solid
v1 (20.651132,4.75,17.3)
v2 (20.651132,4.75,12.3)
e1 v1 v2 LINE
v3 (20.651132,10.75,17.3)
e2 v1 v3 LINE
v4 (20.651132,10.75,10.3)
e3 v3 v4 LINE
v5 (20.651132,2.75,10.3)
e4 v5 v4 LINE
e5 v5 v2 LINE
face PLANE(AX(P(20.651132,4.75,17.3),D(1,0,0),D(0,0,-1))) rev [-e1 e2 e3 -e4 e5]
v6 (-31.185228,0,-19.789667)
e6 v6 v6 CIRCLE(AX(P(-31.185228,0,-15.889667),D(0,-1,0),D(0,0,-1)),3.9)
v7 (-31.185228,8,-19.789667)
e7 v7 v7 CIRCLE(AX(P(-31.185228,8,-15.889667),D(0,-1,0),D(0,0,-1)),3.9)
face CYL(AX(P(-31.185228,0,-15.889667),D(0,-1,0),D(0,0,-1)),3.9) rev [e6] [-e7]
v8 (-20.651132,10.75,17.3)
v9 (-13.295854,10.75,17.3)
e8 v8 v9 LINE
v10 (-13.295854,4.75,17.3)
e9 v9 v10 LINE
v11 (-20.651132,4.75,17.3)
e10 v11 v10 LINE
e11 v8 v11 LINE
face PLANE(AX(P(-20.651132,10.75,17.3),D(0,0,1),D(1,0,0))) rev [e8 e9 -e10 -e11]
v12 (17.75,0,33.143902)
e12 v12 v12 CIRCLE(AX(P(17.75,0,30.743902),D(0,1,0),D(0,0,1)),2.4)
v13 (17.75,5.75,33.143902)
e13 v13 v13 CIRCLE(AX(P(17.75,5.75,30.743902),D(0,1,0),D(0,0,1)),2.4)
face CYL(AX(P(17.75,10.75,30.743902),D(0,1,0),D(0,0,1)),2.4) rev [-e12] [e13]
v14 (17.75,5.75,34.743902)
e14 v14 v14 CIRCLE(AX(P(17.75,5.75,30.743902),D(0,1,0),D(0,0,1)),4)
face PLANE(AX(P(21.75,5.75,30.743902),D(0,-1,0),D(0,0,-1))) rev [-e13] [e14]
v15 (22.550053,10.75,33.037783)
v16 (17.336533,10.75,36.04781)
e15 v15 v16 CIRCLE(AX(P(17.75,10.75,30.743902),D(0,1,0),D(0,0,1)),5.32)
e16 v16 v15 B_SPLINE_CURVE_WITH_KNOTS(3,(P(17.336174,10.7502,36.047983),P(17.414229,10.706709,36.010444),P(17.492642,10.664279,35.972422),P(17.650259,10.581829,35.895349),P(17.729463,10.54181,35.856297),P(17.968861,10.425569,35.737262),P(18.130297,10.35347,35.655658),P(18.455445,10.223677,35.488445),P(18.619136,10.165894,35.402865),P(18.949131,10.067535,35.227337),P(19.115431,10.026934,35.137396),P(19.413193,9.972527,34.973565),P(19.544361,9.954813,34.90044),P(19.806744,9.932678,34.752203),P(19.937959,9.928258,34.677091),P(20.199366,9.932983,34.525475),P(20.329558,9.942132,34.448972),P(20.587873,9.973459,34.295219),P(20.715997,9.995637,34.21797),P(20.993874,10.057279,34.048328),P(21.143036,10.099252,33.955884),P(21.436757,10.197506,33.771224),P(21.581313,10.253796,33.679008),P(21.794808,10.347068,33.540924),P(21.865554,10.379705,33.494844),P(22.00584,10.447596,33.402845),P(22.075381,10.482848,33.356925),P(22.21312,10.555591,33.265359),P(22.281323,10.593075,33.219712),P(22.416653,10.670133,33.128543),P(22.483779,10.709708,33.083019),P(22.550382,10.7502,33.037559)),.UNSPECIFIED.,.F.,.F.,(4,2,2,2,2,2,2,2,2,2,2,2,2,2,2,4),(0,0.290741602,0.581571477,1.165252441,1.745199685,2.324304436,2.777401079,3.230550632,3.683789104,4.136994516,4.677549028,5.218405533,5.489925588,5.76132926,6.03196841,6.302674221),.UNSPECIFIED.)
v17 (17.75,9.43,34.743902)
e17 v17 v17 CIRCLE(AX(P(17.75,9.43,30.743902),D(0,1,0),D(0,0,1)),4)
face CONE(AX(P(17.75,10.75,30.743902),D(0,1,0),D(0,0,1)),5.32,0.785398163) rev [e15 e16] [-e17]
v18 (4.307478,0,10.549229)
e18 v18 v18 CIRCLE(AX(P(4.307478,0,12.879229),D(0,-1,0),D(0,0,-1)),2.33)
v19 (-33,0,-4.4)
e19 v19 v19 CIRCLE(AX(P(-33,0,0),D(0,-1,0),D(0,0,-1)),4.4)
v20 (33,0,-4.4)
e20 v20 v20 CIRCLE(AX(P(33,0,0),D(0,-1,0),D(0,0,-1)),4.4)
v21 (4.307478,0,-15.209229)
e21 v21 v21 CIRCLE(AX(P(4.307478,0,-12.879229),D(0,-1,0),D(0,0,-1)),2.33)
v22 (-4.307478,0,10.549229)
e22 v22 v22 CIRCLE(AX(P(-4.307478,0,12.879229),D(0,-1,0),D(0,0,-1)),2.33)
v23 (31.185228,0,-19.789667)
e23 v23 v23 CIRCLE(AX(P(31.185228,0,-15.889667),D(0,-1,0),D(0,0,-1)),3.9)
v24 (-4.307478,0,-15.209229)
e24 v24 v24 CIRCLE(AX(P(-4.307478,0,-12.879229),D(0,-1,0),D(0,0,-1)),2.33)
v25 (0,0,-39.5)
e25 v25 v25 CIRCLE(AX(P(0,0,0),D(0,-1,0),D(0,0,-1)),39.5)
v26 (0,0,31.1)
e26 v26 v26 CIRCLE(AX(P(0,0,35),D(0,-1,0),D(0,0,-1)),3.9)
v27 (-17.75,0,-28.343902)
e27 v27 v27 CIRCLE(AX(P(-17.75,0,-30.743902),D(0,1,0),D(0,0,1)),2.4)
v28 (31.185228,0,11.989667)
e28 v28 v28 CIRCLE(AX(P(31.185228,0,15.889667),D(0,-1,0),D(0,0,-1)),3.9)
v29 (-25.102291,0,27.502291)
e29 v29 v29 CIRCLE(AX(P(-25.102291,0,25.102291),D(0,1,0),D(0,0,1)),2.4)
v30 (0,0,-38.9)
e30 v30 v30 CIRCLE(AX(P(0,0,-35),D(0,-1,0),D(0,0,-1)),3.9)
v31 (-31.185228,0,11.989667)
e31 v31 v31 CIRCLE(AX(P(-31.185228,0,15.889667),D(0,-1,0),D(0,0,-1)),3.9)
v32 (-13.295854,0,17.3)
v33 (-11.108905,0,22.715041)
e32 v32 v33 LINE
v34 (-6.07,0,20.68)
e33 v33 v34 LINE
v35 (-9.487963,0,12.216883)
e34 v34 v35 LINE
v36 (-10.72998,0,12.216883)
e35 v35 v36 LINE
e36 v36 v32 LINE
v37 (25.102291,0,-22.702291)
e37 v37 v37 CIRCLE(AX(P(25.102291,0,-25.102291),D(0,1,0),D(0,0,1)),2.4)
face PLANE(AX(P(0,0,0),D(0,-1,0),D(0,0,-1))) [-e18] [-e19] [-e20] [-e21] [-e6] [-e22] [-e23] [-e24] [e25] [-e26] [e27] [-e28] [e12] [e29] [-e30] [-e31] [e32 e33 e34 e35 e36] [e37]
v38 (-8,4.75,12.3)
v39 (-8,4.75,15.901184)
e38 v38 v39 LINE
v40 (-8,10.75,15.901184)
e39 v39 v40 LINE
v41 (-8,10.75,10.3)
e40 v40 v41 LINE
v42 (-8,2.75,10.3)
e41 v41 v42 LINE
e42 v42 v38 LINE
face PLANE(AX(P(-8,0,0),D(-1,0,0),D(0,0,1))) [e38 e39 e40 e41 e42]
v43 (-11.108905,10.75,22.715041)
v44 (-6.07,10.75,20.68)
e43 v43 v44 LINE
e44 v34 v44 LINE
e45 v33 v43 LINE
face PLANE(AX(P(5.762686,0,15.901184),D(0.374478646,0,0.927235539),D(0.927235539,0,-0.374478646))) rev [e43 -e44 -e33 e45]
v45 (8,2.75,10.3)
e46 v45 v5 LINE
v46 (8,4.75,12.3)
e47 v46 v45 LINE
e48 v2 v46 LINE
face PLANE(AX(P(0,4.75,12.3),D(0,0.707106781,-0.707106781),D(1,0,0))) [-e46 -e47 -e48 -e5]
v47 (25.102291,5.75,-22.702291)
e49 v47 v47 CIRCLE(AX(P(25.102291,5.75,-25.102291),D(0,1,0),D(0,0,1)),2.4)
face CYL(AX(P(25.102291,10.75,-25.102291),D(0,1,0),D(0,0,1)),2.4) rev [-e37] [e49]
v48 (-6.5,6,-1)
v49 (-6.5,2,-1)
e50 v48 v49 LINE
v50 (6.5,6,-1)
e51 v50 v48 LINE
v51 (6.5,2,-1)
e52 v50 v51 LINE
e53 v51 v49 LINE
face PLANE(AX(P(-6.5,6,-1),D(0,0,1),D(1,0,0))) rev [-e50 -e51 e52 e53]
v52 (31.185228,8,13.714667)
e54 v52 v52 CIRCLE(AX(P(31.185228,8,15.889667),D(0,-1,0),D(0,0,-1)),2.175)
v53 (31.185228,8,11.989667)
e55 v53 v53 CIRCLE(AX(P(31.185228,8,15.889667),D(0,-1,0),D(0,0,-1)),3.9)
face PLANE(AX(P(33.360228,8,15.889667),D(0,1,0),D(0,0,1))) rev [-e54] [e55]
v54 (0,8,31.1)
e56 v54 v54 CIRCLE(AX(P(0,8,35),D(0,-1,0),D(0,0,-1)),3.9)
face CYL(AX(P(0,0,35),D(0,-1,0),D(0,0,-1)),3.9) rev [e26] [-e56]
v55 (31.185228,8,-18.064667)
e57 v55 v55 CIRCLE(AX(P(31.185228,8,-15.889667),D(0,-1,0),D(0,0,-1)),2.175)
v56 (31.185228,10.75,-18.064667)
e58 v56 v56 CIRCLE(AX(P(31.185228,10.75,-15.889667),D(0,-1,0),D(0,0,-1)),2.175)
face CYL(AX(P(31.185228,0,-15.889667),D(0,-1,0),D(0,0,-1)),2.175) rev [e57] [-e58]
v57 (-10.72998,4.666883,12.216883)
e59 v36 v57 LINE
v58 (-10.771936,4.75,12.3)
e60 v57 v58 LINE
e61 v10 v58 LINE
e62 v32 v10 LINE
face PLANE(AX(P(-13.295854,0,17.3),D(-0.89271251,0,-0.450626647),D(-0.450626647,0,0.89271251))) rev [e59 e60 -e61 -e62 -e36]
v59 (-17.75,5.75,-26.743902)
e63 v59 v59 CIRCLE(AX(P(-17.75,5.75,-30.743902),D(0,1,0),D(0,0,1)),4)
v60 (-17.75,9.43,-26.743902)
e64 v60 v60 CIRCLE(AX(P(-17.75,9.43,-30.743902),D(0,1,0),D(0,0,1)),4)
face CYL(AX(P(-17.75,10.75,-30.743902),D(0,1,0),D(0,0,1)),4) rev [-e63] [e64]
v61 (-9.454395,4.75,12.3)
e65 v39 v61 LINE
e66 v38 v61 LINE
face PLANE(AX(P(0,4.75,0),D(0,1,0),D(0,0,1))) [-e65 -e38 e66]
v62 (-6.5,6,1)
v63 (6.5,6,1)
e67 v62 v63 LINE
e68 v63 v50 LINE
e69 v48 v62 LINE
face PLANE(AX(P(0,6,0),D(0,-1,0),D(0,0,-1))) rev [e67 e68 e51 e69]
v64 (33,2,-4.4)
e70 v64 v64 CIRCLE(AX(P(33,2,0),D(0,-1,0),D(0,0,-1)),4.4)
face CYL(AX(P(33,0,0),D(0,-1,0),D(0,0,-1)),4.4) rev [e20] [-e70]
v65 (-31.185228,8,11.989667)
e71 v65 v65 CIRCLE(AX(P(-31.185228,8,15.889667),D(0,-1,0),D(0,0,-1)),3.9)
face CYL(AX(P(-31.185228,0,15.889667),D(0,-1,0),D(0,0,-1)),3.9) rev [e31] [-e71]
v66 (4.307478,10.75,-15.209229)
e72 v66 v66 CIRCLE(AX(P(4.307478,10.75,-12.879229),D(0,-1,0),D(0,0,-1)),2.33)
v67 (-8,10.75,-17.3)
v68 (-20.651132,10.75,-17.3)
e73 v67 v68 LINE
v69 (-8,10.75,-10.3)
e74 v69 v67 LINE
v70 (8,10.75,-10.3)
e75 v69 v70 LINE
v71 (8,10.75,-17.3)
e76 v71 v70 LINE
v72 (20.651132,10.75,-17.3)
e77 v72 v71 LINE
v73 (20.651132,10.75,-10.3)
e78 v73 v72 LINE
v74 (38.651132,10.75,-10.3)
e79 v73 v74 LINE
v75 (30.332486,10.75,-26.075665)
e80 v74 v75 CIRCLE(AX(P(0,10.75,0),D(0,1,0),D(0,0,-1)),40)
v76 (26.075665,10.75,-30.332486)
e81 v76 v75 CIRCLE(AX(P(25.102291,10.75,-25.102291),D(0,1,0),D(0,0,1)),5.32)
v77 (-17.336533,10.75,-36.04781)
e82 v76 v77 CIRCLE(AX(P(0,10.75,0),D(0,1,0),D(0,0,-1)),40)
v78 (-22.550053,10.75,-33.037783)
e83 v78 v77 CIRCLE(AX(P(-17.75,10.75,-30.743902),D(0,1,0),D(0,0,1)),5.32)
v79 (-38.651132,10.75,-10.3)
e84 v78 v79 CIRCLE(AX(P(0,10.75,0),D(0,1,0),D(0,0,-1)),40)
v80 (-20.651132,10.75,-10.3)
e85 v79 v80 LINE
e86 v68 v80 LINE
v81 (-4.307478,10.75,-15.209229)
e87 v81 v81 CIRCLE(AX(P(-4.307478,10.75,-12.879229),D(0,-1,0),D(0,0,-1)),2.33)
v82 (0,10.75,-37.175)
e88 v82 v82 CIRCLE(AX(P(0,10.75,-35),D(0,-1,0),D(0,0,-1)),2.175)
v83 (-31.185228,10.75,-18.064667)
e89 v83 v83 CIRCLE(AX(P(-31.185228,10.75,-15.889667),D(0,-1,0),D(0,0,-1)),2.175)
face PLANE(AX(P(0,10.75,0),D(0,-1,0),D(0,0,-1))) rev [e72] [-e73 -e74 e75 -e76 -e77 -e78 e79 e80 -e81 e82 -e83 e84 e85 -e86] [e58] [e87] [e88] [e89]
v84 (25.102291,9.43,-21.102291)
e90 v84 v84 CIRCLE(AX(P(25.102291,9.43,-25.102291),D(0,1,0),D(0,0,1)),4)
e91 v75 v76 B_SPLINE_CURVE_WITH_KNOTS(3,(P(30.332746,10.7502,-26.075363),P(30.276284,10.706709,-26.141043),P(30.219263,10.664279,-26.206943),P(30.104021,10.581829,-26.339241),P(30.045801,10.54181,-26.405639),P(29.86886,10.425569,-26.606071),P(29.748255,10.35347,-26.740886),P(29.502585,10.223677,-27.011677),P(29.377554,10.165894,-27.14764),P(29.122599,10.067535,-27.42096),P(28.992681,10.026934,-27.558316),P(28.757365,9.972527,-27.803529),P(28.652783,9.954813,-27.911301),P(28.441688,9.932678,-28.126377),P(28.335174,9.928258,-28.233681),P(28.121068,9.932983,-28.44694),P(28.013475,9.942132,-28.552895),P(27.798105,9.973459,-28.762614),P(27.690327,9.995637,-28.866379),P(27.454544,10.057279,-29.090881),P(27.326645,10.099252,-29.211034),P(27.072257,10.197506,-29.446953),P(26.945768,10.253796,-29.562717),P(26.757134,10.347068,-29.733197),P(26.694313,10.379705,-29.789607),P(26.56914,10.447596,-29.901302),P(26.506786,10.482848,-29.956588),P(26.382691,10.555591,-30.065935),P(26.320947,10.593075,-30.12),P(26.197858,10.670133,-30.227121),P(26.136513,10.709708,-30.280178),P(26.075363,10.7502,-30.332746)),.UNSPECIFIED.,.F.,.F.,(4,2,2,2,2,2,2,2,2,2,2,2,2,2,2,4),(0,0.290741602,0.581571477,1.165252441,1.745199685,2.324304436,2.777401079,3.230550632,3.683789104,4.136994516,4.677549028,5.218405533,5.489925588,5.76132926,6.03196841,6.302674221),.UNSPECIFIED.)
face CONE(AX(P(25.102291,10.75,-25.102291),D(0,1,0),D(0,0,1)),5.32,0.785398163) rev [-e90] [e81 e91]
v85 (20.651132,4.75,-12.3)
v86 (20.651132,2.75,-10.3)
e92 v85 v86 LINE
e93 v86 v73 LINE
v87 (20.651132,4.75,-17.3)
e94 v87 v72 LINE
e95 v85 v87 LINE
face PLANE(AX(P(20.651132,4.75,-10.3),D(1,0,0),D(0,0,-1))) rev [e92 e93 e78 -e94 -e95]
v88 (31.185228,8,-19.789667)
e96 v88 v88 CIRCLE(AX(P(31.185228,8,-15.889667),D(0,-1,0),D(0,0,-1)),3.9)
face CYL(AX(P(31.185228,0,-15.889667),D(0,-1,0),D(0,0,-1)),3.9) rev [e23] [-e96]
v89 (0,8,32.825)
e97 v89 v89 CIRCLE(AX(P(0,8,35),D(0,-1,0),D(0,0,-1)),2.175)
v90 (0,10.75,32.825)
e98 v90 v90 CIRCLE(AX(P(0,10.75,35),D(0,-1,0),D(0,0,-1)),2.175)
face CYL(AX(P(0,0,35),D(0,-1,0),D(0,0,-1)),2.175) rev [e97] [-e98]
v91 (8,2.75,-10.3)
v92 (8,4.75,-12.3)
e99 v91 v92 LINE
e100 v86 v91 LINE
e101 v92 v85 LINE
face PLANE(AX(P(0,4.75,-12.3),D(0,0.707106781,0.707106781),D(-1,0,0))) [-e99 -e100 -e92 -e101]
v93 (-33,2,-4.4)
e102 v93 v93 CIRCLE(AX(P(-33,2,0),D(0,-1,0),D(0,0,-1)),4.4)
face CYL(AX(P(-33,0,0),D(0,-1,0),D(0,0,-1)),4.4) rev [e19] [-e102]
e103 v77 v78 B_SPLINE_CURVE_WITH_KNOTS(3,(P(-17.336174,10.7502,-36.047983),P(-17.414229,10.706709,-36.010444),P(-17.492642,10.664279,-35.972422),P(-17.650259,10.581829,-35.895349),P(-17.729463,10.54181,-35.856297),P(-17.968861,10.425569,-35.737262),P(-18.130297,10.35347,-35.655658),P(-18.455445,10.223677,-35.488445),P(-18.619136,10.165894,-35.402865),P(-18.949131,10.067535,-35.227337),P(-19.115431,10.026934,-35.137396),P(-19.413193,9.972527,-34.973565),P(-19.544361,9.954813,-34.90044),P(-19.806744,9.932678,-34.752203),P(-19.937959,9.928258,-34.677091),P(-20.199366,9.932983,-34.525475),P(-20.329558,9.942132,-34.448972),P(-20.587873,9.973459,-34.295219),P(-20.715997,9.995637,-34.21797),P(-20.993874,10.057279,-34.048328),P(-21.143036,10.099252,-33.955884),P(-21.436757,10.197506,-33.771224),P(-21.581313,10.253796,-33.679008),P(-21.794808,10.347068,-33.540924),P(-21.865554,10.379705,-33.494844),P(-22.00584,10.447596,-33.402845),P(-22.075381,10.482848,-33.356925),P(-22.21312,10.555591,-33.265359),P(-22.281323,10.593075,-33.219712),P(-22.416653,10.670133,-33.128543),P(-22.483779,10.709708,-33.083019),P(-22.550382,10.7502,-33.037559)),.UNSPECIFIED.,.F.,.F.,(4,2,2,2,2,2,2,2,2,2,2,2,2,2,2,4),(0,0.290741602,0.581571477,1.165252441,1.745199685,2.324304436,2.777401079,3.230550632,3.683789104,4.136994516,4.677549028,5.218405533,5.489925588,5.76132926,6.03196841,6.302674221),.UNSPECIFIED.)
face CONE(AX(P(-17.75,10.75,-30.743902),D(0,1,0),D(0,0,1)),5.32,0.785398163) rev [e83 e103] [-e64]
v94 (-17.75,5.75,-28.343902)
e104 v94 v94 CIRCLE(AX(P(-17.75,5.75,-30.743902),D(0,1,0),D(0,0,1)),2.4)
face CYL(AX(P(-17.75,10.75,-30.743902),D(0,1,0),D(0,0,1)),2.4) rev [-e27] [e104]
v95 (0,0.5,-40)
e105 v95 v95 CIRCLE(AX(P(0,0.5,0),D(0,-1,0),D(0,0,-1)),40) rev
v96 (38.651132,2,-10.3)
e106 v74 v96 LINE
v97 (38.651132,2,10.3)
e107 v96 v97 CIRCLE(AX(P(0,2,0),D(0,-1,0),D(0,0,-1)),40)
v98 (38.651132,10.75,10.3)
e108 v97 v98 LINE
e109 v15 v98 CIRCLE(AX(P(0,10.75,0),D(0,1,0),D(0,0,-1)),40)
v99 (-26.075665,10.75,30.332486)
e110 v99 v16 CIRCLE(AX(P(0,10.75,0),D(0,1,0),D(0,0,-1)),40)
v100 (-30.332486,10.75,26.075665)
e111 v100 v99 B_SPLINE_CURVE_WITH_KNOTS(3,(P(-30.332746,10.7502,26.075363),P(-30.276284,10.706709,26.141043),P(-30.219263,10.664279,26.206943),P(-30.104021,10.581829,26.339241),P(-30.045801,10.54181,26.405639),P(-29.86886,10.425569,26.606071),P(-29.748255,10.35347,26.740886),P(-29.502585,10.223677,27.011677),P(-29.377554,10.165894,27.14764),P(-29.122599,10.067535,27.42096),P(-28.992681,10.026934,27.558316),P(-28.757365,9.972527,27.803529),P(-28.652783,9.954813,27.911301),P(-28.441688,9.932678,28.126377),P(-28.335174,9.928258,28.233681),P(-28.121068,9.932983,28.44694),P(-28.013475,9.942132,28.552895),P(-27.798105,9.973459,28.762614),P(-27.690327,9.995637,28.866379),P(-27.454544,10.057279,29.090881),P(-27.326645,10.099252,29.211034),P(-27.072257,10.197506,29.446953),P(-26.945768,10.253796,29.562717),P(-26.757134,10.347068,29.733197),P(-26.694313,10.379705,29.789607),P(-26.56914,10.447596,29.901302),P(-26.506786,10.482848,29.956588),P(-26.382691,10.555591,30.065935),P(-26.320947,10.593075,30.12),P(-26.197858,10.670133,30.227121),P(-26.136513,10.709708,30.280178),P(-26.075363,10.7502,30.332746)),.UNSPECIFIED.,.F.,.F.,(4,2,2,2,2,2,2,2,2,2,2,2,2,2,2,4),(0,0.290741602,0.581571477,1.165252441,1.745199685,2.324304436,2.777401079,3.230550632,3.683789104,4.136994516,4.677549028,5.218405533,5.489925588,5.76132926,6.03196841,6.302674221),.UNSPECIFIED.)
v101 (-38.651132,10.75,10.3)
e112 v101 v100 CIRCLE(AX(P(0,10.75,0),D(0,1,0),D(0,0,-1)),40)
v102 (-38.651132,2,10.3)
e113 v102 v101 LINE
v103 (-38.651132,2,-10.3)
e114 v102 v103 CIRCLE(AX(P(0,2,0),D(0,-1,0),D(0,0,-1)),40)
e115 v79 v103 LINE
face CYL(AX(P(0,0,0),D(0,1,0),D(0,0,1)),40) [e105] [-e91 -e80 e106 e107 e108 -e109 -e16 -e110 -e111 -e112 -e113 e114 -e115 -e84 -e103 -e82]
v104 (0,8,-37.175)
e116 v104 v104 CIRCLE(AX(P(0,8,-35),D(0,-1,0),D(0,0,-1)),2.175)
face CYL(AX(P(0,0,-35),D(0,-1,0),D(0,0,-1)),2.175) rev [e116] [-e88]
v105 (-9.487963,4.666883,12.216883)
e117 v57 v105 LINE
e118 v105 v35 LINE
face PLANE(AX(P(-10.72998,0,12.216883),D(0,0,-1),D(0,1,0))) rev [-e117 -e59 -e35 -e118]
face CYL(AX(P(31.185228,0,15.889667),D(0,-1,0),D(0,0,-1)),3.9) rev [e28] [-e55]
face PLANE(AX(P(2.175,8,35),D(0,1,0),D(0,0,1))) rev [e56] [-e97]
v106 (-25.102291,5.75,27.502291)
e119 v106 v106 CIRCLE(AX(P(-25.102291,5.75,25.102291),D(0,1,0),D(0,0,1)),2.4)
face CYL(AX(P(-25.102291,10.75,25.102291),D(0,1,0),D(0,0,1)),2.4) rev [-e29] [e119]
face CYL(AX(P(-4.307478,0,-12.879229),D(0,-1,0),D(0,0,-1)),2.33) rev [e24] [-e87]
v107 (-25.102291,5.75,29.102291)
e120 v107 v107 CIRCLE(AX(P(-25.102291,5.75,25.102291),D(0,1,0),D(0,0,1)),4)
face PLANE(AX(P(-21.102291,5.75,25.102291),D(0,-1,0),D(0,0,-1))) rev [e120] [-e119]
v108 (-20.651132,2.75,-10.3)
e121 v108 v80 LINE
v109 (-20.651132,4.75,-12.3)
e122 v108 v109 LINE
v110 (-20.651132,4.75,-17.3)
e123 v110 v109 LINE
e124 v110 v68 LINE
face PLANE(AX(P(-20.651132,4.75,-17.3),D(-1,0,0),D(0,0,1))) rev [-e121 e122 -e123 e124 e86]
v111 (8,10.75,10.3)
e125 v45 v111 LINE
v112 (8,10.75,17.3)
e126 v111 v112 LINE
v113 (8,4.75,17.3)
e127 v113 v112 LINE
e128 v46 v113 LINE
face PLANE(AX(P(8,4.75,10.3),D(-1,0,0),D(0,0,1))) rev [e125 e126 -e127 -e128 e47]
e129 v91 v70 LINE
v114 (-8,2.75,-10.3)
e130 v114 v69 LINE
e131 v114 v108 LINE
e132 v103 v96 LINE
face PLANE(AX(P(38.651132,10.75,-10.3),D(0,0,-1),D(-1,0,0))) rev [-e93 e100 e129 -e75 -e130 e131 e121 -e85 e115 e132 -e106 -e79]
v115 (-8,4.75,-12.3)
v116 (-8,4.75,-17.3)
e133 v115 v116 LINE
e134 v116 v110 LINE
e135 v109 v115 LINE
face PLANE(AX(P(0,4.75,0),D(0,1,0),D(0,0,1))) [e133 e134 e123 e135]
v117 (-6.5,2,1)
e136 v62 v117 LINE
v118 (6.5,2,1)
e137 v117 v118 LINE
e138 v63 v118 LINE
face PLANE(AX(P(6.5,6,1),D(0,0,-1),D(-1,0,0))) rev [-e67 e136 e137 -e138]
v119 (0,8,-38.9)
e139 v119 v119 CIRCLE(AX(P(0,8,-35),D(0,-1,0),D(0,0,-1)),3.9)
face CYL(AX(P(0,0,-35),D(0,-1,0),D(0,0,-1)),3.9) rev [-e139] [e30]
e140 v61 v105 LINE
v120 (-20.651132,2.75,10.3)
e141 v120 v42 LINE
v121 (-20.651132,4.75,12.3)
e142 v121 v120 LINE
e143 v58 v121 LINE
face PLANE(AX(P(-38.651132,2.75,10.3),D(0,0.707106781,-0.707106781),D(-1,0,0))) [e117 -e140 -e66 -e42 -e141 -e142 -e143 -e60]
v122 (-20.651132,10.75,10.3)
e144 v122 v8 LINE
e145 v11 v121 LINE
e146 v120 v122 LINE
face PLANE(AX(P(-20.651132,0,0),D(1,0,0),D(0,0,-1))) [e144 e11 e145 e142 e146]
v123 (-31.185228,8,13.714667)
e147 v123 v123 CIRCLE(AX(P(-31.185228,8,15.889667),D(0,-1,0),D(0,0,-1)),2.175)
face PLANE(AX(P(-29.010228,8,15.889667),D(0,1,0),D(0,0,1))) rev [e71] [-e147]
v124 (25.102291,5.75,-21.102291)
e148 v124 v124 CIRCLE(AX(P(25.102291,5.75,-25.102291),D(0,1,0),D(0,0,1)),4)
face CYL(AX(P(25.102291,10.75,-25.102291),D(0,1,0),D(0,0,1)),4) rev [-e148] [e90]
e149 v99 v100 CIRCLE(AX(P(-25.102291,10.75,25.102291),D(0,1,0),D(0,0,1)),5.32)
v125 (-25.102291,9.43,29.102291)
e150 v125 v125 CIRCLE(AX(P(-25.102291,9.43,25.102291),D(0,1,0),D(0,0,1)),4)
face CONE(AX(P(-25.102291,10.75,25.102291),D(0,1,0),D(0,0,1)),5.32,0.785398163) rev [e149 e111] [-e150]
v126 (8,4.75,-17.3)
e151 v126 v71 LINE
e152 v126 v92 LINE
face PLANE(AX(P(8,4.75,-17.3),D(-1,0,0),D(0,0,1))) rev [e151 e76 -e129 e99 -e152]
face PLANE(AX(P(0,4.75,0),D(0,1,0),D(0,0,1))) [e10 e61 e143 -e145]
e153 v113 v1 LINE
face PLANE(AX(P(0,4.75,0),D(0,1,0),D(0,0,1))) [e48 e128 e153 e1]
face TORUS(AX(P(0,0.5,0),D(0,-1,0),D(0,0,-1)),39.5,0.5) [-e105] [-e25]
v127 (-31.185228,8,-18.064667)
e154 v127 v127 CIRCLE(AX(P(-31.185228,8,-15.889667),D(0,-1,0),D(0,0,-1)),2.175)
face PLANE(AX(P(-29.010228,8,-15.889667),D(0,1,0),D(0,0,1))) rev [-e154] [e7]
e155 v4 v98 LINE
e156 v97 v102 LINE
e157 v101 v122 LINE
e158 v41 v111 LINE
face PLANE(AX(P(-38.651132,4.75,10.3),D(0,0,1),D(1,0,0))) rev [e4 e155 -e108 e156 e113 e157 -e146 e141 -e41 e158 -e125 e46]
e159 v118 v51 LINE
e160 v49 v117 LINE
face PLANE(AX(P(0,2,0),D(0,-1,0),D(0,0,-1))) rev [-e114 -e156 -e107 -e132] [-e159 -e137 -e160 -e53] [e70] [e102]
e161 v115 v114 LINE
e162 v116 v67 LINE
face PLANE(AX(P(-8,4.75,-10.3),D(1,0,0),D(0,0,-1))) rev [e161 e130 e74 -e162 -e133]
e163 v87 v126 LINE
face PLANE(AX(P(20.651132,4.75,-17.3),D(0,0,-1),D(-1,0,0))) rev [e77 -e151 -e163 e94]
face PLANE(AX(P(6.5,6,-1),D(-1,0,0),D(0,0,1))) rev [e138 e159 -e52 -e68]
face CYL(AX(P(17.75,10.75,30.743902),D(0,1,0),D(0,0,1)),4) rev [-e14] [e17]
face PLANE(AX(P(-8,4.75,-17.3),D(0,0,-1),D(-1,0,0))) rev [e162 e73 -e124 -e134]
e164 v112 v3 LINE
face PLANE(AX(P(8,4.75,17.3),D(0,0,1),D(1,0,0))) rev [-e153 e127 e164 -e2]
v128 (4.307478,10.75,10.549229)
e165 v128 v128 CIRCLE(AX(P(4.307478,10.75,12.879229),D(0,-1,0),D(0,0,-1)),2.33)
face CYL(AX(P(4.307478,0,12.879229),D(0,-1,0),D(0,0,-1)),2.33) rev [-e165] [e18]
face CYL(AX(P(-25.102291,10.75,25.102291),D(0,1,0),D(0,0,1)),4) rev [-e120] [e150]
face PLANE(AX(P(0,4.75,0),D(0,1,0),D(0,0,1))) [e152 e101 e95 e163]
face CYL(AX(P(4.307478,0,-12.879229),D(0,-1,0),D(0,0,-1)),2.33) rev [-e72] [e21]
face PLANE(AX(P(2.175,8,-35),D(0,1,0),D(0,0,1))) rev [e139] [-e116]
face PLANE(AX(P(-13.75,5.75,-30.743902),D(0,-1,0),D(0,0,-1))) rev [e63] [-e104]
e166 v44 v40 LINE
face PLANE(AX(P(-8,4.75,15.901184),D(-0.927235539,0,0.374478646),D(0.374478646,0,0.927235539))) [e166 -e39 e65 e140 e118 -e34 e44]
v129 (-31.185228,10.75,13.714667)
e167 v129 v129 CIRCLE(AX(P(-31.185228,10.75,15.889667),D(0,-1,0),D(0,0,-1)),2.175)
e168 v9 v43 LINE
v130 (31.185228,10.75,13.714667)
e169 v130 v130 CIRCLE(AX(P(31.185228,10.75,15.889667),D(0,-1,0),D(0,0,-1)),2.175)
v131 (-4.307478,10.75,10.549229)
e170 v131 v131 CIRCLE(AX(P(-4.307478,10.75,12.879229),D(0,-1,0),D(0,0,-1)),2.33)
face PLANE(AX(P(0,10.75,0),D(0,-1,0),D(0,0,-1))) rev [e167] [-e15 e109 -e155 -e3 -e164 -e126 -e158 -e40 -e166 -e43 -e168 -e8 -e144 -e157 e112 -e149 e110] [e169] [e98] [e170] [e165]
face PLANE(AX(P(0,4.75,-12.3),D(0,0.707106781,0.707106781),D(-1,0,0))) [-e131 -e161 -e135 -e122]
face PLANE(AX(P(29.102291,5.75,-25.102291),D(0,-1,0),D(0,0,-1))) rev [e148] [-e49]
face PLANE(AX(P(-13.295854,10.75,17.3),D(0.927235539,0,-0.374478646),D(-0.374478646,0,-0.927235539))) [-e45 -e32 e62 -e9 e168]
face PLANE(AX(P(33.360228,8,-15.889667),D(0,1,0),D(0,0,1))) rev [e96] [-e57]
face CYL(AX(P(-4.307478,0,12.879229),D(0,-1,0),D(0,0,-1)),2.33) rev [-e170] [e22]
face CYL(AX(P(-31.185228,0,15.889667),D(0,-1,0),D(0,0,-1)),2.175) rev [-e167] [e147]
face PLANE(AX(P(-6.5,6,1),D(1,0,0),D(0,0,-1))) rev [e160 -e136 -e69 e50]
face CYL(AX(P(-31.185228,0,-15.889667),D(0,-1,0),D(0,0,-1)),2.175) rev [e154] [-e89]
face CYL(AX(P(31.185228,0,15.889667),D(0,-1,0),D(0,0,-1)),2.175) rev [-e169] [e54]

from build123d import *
from build123d.topology import SkipClean

# Parameters (mm, degrees)
SKETCH1_R                                        = 40
BOSS_EXTRUDE1_DEPTH                              = 10.75
CUT_EXTRUDE1_DEPTH                               = 6
CUT_EXTRUDE2_DEPTH                               = 6
SKETCH4_W                                        = 6
SKETCH4_H                                        = 5.601183879
CUT_EXTRUDE3_DEPTH                               = 0.706099456
SKETCH5_W                                        = 5.601183879
SKETCH5_H                                        = 6
CUT_EXTRUDE4_DEPTH                               = 4.589754851
SKETCH6_W                                        = 7
SKETCH6_H                                        = 6
CUT_EXTRUDE5_DEPTH                               = 7.355277629
CUT_EXTRUDE6_REACH                               = 59.241
SKETCH8_W                                        = 12.651131937
SKETCH8_H                                        = 7
CUT_EXTRUDE7_DEPTH                               = 6
BOSS_EXTRUDE2_START                              = 8.75
BOSS_EXTRUDE2_DEPTH                              = 8.75
SKETCH10_W                                       = 12.651131937
SKETCH10_H                                       = 7
CUT_EXTRUDE8_DEPTH                               = 6
SKETCH11_W                                       = 12.651131937
SKETCH11_H                                       = 7
CUT_EXTRUDE9_DEPTH                               = 6
SKETCH12_W                                       = 13
SKETCH12_H                                       = 2
BOSS_EXTRUDE3_DEPTH                              = 4
DRAFT1_ANGLE                                     = 68.007906367
DRAFT2_ANGLE                                     = 21.992093633
M4_CLEARANCE_HOLE1_D                             = 4.66
CBORE_FOR_M4_HEX_HEAD_MACHINE_SCREW1_AT_COUNT    = 2
CBORE_FOR_M4_HEX_HEAD_MACHINE_SCREW1_AT_PITCH    = 43.22206146
CBORE_FOR_M4_HEX_HEAD_MACHINE_SCREW1_2_COUNT     = 2
CBORE_FOR_M4_HEX_HEAD_MACHINE_SCREW1_2_PITCH     = 71
CBORE_FOR_M4_HEX_HEAD_MACHINE_SCREW1_3_COUNT     = 2
CBORE_FOR_M4_HEX_HEAD_MACHINE_SCREW1_3_PITCH     = 56.328087161
F_8_8_8_8_DIAMETER_HOLE1_D                       = 8.8
F_8_8_8_8_DIAMETER_HOLE1_DEPTH                   = 10.75
CBORE_FOR_M4_HEX_HEAD_MACHINE_SCREW2_D           = 4.35
CBORE_FOR_M4_HEX_HEAD_MACHINE_SCREW2_CBORE_D     = 7.8
CBORE_FOR_M4_HEX_HEAD_MACHINE_SCREW2_CBORE_DEPTH = 8
CHAMFER1_SIZE                                    = 2
CHAMFER2_SIZE                                    = 1.5311569
CHAMFER2_SIZE2                                   = 1.474148544
FILLET1_R                                        = 0.5


with BuildPart() as part:
    # Sketch1 → Boss-Extrude1 (new body)
    with BuildSketch(Plane(origin=(0, 10.75, 0), x_dir=(1, 0, 0), z_dir=(0, 1, 0))):
        with Locations(Location((0, 0, 0), (0, 0, 90))):
            Circle(SKETCH1_R)
        Polygon((-13.295854308, -23.598274832), (-13.295854308, -17.3), (-12.589754851, -15.901183879), (5.76268576, -15.901183879), align=None, mode=Mode.SUBTRACT)
    extrude(amount=-BOSS_EXTRUDE1_DEPTH)

    # Sketch2 → Cut-Extrude1 (cut)
    with BuildSketch(Plane(origin=(0, 10.75, 0), x_dir=(-1, 0, 0), z_dir=(0, 1, 0))):
        Polygon((12.589754851, 15.901183879), (13.295854308, 15.901183879), (13.295854308, 17.3), align=None)
    extrude(amount=-CUT_EXTRUDE1_DEPTH, mode=Mode.SUBTRACT)

    # Sketch3 → Cut-Extrude2 (cut)
    with BuildSketch(Plane(origin=(0, 10.75, 0), x_dir=(-1, 0, 0), z_dir=(0, 1, 0))):
        with BuildLine():
            Line((38.651131937, 10.3), (-38.651131937, 10.3))
            ThreePointArc((-38.651131937, 10.3), (0, -40), (38.651131937, 10.3))
        make_face()
    extrude(amount=-CUT_EXTRUDE2_DEPTH, mode=Mode.SUBTRACT)

    # Sketch4 → Cut-Extrude3 (cut)
    with BuildSketch(Plane(origin=(-13.295854308, 0, 0), x_dir=(0, -1, 0), z_dir=(-1, 0, 0))):
        with Locations((-7.75, 13.10059194)):
            Rectangle(SKETCH4_W, SKETCH4_H)
    extrude(amount=-CUT_EXTRUDE3_DEPTH, mode=Mode.SUBTRACT)

    # Sketch5 → Cut-Extrude4 (cut)
    with BuildSketch(Plane.ZY.offset(12.589754851)):
        with Locations((13.10059194, 7.75)):
            Rectangle(SKETCH5_W, SKETCH5_H)
    extrude(amount=-CUT_EXTRUDE4_DEPTH, mode=Mode.SUBTRACT)

    # Sketch6 → Cut-Extrude5 (cut)
    with BuildSketch(Plane(origin=(-13.295854308, 0, 0), x_dir=(0, 0, -1), z_dir=(1, 0, 0))):
        with Locations((-13.8, 7.75)):
            Rectangle(SKETCH6_W, SKETCH6_H)
    extrude(amount=-CUT_EXTRUDE5_DEPTH, mode=Mode.SUBTRACT)

    # Sketch7 → Cut-Extrude6 (cut, up to next)
    with BuildSketch(Plane.XZ.offset(-2), mode=Mode.PRIVATE) as cut_extrude6_sk1:
        with BuildLine():
            Line((38.651131937, 10.3), (-38.651131937, 10.3))
            ThreePointArc((-38.651131937, 10.3), (0, -40), (38.651131937, 10.3))
        make_face()
    cut_extrude6_tool1 = extrude(cut_extrude6_sk1.sketch, amount=-CUT_EXTRUDE6_REACH, mode=Mode.PRIVATE) & part.part
    add(cut_extrude6_tool1.solids().sort_by_distance((0, 2, -11.566508))[0], mode=Mode.SUBTRACT)

    # Sketch8 → Cut-Extrude7 (cut)
    with BuildSketch(Plane(origin=(0, 10.75, 0), x_dir=(-1, 0, 0), z_dir=(0, 1, 0))):
        with Locations((-14.325565969, 13.8)):
            Rectangle(SKETCH8_W, SKETCH8_H)
    extrude(amount=-CUT_EXTRUDE7_DEPTH, mode=Mode.SUBTRACT)

    # Sketch9 → Boss-Extrude2 (add)
    with SkipClean():  # the faces are left unmerged after this step: merging them gives an invalid solid
        with BuildSketch(Plane(origin=(0, 2, 0), x_dir=(-1, 0, 0), z_dir=(0, 1, 0)).offset(BOSS_EXTRUDE2_START)):
            with BuildLine():
                Line((-38.651131937, -10.3), (38.651131937, -10.3))
                ThreePointArc((38.651131937, -10.3), (0, -40), (-38.651131937, -10.3))
            make_face()
        extrude(amount=-BOSS_EXTRUDE2_DEPTH)
    add(part.part.scale(1), mode=Mode.REPLACE)  # the faces are merged on a copy

    # Sketch10 → Cut-Extrude8 (cut)
    with BuildSketch(Plane(origin=(0, 10.75, 0), x_dir=(-1, 0, 0), z_dir=(0, 1, 0))):
        with Locations((-14.325565969, -13.8)):
            Rectangle(SKETCH10_W, SKETCH10_H)
    extrude(amount=-CUT_EXTRUDE8_DEPTH, mode=Mode.SUBTRACT)

    # Sketch11 → Cut-Extrude9 (cut)
    with BuildSketch(Plane(origin=(0, 10.75, 0), x_dir=(-1, 0, 0), z_dir=(0, 1, 0))):
        with Locations((14.325565969, -13.8)):
            Rectangle(SKETCH11_W, SKETCH11_H)
    extrude(amount=-CUT_EXTRUDE9_DEPTH, mode=Mode.SUBTRACT)

    # Sketch12 → Boss-Extrude3 (add)
    with BuildSketch(Plane(origin=(0, 2, 0), x_dir=(-1, 0, 0), z_dir=(0, 1, 0))):
        Rectangle(SKETCH12_W, SKETCH12_H)
    extrude(amount=BOSS_EXTRUDE3_DEPTH)

    # Draft1
    draft1_faces = [part.faces().sort_by_distance(p)[0] for p in [
        (-2.297176197, 4.989704408, 15.901183879),
    ]]
    draft(draft1_faces, Plane(origin=(-8, 0, 0), x_dir=(0, 0, -1), z_dir=(-1, 0, 0)), DRAFT1_ANGLE)

    # Draft2
    draft2_faces = [part.faces().sort_by_distance(p)[0] for p in [
        (-13.295854308, 5.375, 20.449137416),
    ]]
    draft(draft2_faces, Plane(origin=(-20.651131937, 10.75, 17.3), x_dir=(-1, 0, 0), z_dir=(0, 0, -1)), DRAFT2_ANGLE)

    # M4 Clearance Hole1 (through all)
    with Locations(Plane(origin=(0, 0, 0), x_dir=(-1, 0, 0), z_dir=(0, -1, 0))):
        with Locations((-4.307478356, -12.879228634), (4.307478356, 12.879228634), (-4.307478356, 12.879228634), (4.307478356, -12.879228634)):
            Hole(M4_CLEARANCE_HOLE1_D / 2)

    # Sketch15 → CBORE for M4 Hex Head Machine Screw1 (revolve, cut)
    with BuildSketch(Plane(origin=(25.102290732, 10.75, -25.102290732), x_dir=(0, 0, 1), z_dir=(1, 0, 0))):
        Polygon((0, 0), (0, 10.75), (2.4, 10.75), (2.4, 5), (4, 5), (4, 1.32), (5.32, 0), align=None)
    cbore_for_m4_hex_head_machine_screw1 = revolve(axis=Axis((25.102290732, 17.1, -25.102290732), (0, -1, 0)), mode=Mode.SUBTRACT)

    # CBORE for M4 Hex Head Machine Screw1 at: CBORE for M4 Hex Head Machine Screw1 ×2
    with Locations(*[Vector(-0.9914448613738109, 0, -0.13052619222004783) * (i * CBORE_FOR_M4_HEX_HEAD_MACHINE_SCREW1_AT_PITCH) for i in range(1, CBORE_FOR_M4_HEX_HEAD_MACHINE_SCREW1_AT_COUNT)]):
        add(cbore_for_m4_hex_head_machine_screw1, mode=Mode.SUBTRACT)

    # CBORE for M4 Hex Head Machine Screw1 2: CBORE for M4 Hex Head Machine Screw1 ×2
    with Locations(*[Vector(-0.7071067811865434, 0, 0.7071067811865517) * (i * CBORE_FOR_M4_HEX_HEAD_MACHINE_SCREW1_2_PITCH) for i in range(1, CBORE_FOR_M4_HEX_HEAD_MACHINE_SCREW1_2_COUNT)]):
        add(cbore_for_m4_hex_head_machine_screw1, mode=Mode.SUBTRACT)

    # CBORE for M4 Hex Head Machine Screw1 3: CBORE for M4 Hex Head Machine Screw1 ×2
    with Locations(*[Vector(-0.13052619222004894, 0, 0.9914448613738108) * (i * CBORE_FOR_M4_HEX_HEAD_MACHINE_SCREW1_3_PITCH) for i in range(1, CBORE_FOR_M4_HEX_HEAD_MACHINE_SCREW1_3_COUNT)]):
        add(cbore_for_m4_hex_head_machine_screw1, mode=Mode.SUBTRACT)

    # Ø8.8 (8.8) Diameter Hole1
    with Locations(Plane(origin=(0, 0, 0), x_dir=(-1, 0, 0), z_dir=(0, -1, 0))):
        with Locations((33, 0), (-33, 0)):
            Hole(F_8_8_8_8_DIAMETER_HOLE1_D / 2, depth=F_8_8_8_8_DIAMETER_HOLE1_DEPTH)

    # CBORE for M4 Hex Head Machine Screw2 (through all)
    with Locations(Plane(origin=(0, 0, 0), x_dir=(-1, 0, 0), z_dir=(0, -1, 0))):
        with Locations((31.185228347, -15.889667491), (0, -35), (-31.185228347, -15.889667491), (31.185228347, 15.889667491), (0, 35), (-31.185228347, 15.889667491)):
            CounterBoreHole(CBORE_FOR_M4_HEX_HEAD_MACHINE_SCREW2_D / 2, CBORE_FOR_M4_HEX_HEAD_MACHINE_SCREW2_CBORE_D / 2, CBORE_FOR_M4_HEX_HEAD_MACHINE_SCREW2_CBORE_DEPTH)

    # Chamfer1
    # the kernel refuses this chamfer: 2 mm, written as the material it takes off along each edge
    with BuildSketch(Plane(origin=(8, 4.75, -10.3), x_dir=(0, -0.9996219169112968, 0.027495876610586473), z_dir=(1, 0, 0)), Plane(origin=(-20.651131937, 4.75, -10.3), x_dir=(0, -0.9996219169112968, 0.027495876610586473), z_dir=(1, 0, 0)), Plane(origin=(-8, 4.75, 10.3), x_dir=(0, -0.9996219169112968, -0.027495876610586462), z_dir=(-1, 0, 0)), Plane(origin=(20.651131937, 4.75, 10.3), x_dir=(0, -0.9996219169112968, -0.027495876610586473), z_dir=(-1, 0, 0))) as chamfer1_piece_1:
        Polygon((CHAMFER1_SIZE * 0.999621916911, CHAMFER1_SIZE * 0.0274958766106), (-CHAMFER1_SIZE * 0.0274958766106, CHAMFER1_SIZE * 0.999621916911), (0, 0), align=None)
    extrude(amount=12.651131937, mode=Mode.SUBTRACT)

    # Chamfer2
    chamfer2_edges = [part.edges().sort_by_distance(p)[0] for p in [
        (-10.04, 1.65, 10.85),
    ]]
    chamfer2_side = [part.faces().sort_by_distance(p)[0] for p in [
        (-11.717101205, 2.307785852, 14.1724161),
    ]]
    chamfer(chamfer2_edges, length=CHAMFER2_SIZE, length2=CHAMFER2_SIZE2, reference=chamfer2_side[0])

    # Fillet1
    fillet1_edges = [part.edges().sort_by_distance(p)[0] for p in [
        (0, 0, 40),
    ]]
    fillet(fillet1_edges, radius=FILLET1_R)


solid = part.part
